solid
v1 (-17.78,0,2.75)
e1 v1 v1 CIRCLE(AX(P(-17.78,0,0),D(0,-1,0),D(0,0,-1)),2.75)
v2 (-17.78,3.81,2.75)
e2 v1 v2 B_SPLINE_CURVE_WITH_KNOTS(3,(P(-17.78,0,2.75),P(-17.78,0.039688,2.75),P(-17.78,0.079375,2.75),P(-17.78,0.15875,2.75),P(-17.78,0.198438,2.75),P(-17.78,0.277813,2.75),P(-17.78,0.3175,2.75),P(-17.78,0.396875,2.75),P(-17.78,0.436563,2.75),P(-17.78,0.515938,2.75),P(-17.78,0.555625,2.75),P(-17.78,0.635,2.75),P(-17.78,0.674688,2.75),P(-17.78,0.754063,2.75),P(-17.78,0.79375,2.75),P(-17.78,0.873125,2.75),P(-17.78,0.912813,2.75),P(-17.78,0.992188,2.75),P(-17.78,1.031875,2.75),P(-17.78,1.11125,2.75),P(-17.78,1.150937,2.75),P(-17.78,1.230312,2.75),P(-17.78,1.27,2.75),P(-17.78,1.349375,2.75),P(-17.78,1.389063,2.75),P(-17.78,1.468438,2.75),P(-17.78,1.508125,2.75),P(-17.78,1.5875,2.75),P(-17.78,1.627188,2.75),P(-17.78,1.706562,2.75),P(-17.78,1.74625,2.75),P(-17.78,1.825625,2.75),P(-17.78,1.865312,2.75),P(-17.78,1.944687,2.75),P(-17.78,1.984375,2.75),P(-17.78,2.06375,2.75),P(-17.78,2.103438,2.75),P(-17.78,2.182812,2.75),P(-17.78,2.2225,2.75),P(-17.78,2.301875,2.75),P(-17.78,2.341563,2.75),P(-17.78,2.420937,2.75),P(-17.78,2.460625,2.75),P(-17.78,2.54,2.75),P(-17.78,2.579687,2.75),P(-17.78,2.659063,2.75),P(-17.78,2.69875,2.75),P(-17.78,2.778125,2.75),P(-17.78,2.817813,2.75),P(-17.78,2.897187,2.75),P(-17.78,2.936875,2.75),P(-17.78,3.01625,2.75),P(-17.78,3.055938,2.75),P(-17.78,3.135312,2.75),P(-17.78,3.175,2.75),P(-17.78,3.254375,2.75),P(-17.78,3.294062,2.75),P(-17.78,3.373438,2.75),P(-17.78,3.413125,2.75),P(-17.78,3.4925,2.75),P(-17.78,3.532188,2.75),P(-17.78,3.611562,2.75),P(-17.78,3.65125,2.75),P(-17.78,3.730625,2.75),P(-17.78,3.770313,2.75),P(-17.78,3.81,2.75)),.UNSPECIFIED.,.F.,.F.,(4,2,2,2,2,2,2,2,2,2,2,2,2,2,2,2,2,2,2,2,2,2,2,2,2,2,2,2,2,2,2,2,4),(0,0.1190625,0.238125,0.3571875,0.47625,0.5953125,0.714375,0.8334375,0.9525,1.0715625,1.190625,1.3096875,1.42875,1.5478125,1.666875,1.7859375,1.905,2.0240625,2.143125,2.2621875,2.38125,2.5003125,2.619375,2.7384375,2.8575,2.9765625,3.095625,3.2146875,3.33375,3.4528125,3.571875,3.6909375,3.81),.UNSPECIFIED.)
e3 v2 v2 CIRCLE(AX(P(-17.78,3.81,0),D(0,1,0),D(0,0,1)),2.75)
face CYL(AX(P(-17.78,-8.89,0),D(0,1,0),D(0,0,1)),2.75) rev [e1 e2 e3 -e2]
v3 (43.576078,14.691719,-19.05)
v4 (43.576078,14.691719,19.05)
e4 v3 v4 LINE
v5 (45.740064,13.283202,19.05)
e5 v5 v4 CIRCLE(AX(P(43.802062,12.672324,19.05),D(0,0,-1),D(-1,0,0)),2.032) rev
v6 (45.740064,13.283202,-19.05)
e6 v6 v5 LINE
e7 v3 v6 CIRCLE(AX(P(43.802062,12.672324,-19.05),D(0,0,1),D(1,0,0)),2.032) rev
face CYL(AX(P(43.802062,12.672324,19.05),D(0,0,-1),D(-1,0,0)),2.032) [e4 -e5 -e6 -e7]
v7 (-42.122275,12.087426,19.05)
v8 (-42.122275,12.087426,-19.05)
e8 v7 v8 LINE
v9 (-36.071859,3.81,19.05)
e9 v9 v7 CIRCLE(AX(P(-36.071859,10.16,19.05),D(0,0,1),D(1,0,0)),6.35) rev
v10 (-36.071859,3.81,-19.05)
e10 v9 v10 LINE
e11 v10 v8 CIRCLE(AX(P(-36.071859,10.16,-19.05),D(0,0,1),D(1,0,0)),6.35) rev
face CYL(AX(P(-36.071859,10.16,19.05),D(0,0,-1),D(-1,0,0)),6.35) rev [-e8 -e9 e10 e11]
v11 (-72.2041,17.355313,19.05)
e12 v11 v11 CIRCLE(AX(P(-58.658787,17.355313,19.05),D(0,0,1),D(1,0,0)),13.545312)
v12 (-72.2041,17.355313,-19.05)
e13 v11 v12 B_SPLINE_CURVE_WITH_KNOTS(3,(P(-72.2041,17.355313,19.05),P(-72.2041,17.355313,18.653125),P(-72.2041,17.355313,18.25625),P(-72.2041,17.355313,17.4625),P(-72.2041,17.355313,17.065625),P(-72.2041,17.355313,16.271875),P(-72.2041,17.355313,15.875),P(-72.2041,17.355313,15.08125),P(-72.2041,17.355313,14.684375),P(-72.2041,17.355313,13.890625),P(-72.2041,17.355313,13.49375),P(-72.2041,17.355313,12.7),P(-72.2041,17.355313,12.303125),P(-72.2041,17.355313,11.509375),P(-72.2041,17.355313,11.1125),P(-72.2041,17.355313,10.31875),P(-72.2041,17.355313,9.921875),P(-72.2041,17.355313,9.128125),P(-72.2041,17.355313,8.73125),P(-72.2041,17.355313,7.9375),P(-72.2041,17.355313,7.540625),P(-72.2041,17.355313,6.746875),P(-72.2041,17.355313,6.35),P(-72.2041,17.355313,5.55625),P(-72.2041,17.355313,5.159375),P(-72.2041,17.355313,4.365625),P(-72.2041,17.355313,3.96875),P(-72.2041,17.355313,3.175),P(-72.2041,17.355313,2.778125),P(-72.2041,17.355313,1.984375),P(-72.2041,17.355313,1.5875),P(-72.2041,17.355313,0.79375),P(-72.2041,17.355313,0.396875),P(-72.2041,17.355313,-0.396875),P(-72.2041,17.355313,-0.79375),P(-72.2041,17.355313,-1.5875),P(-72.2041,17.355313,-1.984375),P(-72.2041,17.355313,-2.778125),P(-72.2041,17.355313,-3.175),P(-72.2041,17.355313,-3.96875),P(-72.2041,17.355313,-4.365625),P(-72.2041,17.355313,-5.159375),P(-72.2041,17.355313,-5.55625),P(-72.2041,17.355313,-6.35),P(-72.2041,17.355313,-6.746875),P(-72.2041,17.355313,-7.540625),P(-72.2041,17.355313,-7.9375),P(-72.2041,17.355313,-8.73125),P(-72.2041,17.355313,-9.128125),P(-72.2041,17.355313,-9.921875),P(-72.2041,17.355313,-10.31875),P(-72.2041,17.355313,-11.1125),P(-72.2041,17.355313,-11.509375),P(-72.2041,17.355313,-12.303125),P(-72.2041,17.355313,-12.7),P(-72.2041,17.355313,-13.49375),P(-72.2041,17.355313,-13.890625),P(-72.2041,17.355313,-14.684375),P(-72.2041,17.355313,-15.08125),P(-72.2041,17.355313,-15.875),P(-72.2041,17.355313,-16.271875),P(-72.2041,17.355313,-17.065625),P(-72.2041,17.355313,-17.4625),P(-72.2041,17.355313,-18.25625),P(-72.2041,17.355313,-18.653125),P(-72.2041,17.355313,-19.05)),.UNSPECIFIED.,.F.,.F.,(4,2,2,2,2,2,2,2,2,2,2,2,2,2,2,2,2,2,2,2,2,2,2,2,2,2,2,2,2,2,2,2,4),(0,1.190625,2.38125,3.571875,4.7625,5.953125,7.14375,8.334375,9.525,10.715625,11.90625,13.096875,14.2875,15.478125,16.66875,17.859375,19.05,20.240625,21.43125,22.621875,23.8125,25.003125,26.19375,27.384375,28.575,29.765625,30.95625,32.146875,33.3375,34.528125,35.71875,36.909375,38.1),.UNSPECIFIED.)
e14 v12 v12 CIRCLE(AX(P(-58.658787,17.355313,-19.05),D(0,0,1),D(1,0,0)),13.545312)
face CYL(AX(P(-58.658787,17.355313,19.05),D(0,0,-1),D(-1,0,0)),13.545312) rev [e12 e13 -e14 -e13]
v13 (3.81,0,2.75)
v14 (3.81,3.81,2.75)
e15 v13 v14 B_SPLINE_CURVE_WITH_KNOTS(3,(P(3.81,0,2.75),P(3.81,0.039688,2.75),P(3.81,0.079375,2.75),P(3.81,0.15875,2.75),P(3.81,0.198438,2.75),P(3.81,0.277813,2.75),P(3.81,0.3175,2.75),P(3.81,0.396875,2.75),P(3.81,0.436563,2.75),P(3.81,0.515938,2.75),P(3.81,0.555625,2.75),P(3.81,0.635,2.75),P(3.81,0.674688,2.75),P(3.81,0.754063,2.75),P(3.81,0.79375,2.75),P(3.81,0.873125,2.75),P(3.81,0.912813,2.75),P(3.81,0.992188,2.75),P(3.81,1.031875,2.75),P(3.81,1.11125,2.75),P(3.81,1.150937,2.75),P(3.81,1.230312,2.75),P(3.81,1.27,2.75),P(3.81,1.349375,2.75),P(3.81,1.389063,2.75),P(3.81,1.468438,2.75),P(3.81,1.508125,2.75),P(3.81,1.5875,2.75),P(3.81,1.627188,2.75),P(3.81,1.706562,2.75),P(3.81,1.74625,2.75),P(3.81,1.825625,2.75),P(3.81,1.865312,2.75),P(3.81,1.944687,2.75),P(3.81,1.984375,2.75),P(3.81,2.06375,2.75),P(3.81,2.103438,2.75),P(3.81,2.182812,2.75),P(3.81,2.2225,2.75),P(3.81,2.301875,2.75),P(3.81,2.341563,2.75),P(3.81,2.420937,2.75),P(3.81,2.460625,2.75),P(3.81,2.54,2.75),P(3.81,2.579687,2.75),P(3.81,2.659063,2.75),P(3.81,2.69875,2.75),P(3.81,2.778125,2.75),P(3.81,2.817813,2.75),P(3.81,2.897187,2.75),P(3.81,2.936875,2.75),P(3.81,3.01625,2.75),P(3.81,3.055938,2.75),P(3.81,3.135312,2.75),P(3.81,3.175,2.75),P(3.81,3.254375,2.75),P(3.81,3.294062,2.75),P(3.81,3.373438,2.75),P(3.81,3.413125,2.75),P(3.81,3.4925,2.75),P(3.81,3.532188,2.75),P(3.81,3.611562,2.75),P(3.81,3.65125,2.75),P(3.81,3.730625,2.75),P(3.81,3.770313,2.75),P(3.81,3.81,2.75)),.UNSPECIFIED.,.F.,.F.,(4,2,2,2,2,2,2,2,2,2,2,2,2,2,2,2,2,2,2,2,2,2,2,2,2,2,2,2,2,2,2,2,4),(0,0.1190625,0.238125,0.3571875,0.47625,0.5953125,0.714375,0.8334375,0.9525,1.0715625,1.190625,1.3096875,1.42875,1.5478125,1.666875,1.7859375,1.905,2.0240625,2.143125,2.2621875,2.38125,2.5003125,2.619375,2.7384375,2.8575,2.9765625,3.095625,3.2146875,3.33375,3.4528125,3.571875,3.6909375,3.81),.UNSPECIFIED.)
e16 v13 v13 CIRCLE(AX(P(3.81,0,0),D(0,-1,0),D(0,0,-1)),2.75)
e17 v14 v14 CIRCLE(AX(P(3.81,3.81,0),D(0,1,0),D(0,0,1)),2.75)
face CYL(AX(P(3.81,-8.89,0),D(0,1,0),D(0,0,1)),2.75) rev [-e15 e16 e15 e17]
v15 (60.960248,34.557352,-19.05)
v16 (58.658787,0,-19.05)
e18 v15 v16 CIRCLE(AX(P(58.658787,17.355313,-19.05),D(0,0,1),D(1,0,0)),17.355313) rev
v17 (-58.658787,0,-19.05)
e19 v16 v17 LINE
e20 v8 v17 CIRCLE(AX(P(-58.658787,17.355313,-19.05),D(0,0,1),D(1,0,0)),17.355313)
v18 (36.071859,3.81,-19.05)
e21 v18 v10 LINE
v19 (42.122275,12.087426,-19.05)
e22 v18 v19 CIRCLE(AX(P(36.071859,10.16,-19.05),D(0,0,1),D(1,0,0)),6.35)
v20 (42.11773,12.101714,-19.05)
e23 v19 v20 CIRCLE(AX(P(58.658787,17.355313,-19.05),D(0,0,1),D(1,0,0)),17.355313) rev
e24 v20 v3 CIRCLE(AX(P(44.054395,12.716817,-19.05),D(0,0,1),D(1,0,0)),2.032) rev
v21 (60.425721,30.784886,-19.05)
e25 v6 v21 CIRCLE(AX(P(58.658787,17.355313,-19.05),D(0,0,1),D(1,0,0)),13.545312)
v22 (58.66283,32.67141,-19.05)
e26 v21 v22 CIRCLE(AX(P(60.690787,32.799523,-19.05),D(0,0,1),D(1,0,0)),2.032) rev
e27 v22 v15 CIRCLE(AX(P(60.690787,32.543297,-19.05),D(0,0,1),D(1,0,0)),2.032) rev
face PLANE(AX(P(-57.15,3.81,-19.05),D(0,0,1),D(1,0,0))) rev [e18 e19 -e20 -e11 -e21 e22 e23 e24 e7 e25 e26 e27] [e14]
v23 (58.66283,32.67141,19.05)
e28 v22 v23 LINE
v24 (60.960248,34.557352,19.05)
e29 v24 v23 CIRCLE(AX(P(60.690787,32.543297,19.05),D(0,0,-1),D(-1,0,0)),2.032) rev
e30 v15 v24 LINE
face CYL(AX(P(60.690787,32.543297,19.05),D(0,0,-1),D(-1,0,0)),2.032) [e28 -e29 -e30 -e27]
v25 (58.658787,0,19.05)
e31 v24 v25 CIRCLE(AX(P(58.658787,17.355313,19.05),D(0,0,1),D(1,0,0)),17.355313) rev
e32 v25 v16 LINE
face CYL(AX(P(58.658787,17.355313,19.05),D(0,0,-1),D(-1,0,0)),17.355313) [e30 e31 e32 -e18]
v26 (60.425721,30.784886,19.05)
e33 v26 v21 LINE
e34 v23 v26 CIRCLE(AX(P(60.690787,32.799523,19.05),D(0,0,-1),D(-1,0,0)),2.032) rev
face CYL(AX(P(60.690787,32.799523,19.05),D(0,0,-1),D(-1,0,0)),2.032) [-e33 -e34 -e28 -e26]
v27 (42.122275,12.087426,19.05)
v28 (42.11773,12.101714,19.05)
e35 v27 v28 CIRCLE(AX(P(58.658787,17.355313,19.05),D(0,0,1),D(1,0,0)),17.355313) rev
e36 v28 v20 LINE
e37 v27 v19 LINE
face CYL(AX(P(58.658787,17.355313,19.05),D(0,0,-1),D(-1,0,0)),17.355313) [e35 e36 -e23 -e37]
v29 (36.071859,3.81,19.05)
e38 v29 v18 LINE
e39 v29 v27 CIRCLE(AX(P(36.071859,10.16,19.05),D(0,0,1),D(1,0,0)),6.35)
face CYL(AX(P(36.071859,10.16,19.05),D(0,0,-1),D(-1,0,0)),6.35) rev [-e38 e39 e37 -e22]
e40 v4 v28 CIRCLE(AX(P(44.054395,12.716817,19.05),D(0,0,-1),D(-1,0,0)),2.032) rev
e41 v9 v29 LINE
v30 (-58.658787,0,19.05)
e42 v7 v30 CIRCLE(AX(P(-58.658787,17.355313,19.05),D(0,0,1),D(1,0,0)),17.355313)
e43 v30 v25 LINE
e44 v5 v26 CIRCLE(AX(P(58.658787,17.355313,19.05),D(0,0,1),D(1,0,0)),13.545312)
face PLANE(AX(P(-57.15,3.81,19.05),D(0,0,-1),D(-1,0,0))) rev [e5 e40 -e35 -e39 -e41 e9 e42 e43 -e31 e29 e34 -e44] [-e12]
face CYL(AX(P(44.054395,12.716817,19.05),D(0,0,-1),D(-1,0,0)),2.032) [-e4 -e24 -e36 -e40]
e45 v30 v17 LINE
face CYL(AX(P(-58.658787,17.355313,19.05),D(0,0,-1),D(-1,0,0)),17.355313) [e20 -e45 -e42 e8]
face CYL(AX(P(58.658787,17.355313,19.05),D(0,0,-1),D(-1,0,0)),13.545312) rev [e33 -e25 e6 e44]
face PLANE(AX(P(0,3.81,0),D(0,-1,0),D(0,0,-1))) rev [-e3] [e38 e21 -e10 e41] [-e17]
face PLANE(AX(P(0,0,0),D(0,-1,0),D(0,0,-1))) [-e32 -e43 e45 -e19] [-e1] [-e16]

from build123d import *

# Parameters (mm, degrees)
SKETCH3_W           = 114.3
SKETCH3_H           = 38.1
BOSS_EXTRUDE1_DEPTH = 3.81
SKETCH4_R           = 13.5453125
BOSS_EXTRUDE2_DEPTH = 19.05
FILLET1_R           = 2.032
SKETCH5_R           = 2.749999961
CUT_EXTRUDE4_DEPTH  = 12.7


with BuildPart() as part:
    # Sketch3 → Boss-Extrude1 (new body)
    with BuildSketch(Plane(origin=(0, 0, 0), x_dir=(1, 0, 0), z_dir=(0, 1, 0))):
        Rectangle(SKETCH3_W, SKETCH3_H)
    extrude(amount=BOSS_EXTRUDE1_DEPTH)

    # Sketch4 → Boss-Extrude2 (add, symmetric)
    with BuildSketch(Plane.XY):
        with BuildLine():
            Line((-36.071859255, 3.81), (36.071859255, 3.81))
            ThreePointArc((36.071859255, 3.81), (41.198342199, 6.412778013), (42.122274879, 12.087425946))
            ThreePointArc((42.122274879, 12.087425946), (41.806974837, 13.2052175), (41.567140999, 14.341594112))
            Line((41.567140999, 14.341594112), (45.319258538, 15.003193668))
            ThreePointArc((45.319258538, 15.003193668), (67.365546349, 6.979001129), (63.291557028, 30.083742702))
            ThreePointArc((63.291557028, 30.083742702), (61.010906137, 30.694841267), (58.658787305, 30.900625))
            Line((58.658787305, 30.900625), (58.658787305, 34.710625))
            ThreePointArc((58.658787305, 34.710625), (61.672505693, 34.446958806), (64.594653774, 33.663971588))
            ThreePointArc((64.594653774, 33.663971588), (75.750433611, 14.341594112), (58.658787305, 0))
            Line((58.658787305, 0), (-58.658787305, 0))
            ThreePointArc((-58.658787305, 0), (-70.930846463, 5.083253342), (-76.014099805, 17.3553125))
            ThreePointArc((-76.014099805, 17.3553125), (-55.993216901, 34.504703346), (-42.122274879, 12.087425946))
            ThreePointArc((-42.122274879, 12.087425946), (-41.198342199, 6.412778013), (-36.071859255, 3.81))
        make_face()
        with Locations(Location((-58.658787305, 17.3553125, 0), (0, 0, 180))):
            Circle(SKETCH4_R, mode=Mode.SUBTRACT)
    extrude(amount=BOSS_EXTRUDE2_DEPTH, both=True)

    # Fillet1
    # the kernel refuses this fillet: 2.032 mm, written as the material it takes off along each edge
    with BuildSketch(Plane(origin=(58.658787305, 34.710625, 0), x_dir=(0, -1, 0), z_dir=(0, 0, -1)), Plane(origin=(41.567140999, 14.341594112, 0), x_dir=(0.9848077530122078, 0.17364817766693208, 0), z_dir=(0, 0, 1))) as fillet1_piece_1:
        with BuildLine():
            CenterArc((2.16732771, -2.032), FILLET1_R, 90, 97.620348072)
            ThreePointArc((0.153273302, -2.301460275), (0.03836072, -1.153279249), (0, 0))
            Line((0, 0), (2.16732771, 0))
        make_face()
    extrude(amount=24.816396244, mode=Mode.SUBTRACT)
    with BuildSketch(Plane(origin=(58.658787305, 30.900625, 0), x_dir=(0.9978615634411592, -0.06536283505758803, 0), z_dir=(0, 0, -1)), Plane(origin=(45.319258538, 15.003193668, 0), x_dir=(0.23764666877900192, -0.9713516669148425, 0), z_dir=(0, 0, 1))) as fillet1_piece_2:
        with BuildLine():
            CenterArc((1.903537334, -2.027654697), FILLET1_R, 93.747686363, 82.504627273)
            Line((-0.124117363, -1.894837416), (0, 0))
            ThreePointArc((0, 0), (0.885360027, -0.028965791), (1.770720053, 0))
        make_face()
    extrude(amount=23.797245223, mode=Mode.SUBTRACT)
    with BuildSketch(Plane(origin=(45.319258538, 15.003193668, 0), x_dir=(-0.9848077530122076, -0.17364817766693288, 0), z_dir=(0, 0, -1)), Plane(origin=(58.658787305, 30.900625, 0), x_dir=(0, 1, 0), z_dir=(0, 0, 1))) as fillet1_piece_3:
        with BuildLine():
            CenterArc((1.898898089, -2.032), FILLET1_R, 90, 82.504627273)
            ThreePointArc((-0.115739283, -1.766933481), (-0.028965791, -0.885360027), (0, 0))
            Line((0, 0), (1.898898089, 0))
        make_face()
    extrude(amount=23.797245223, mode=Mode.SUBTRACT)
    with BuildSketch(Plane(origin=(41.567140999, 14.341594112, 0), x_dir=(0.23870589854739682, -0.9710919081110089, 0), z_dir=(0, 0, -1)), Plane(origin=(58.658787305, 34.710625, 0), x_dir=(0.9977896842762429, -0.06645107938864023, 0), z_dir=(0, 0, 1))) as fillet1_piece_4:
        with BuildLine():
            CenterArc((2.171529904, -2.027508638), FILLET1_R, 86.189825964, 97.620348072)
            Line((0.144021266, -2.162537232), (0, 0))
            ThreePointArc((0, 0), (1.153279249, 0.03836072), (2.306558498, 0))
        make_face()
    extrude(amount=24.816396244, mode=Mode.SUBTRACT)

    # Sketch5 → Cut-Extrude4 (cut)
    with BuildSketch(Plane(origin=(0, 3.81, 0), x_dir=(1, 0, 0), z_dir=(0, 1, 0))):
        with Locations(Location((-17.78, 0, 0), (0, 0, 270))):
            Circle(SKETCH5_R)
        with Locations(Location((3.81, 0, 0), (0, 0, 270))):
            Circle(SKETCH5_R)
    extrude(amount=-CUT_EXTRUDE4_DEPTH, mode=Mode.SUBTRACT)


solid = part.part
